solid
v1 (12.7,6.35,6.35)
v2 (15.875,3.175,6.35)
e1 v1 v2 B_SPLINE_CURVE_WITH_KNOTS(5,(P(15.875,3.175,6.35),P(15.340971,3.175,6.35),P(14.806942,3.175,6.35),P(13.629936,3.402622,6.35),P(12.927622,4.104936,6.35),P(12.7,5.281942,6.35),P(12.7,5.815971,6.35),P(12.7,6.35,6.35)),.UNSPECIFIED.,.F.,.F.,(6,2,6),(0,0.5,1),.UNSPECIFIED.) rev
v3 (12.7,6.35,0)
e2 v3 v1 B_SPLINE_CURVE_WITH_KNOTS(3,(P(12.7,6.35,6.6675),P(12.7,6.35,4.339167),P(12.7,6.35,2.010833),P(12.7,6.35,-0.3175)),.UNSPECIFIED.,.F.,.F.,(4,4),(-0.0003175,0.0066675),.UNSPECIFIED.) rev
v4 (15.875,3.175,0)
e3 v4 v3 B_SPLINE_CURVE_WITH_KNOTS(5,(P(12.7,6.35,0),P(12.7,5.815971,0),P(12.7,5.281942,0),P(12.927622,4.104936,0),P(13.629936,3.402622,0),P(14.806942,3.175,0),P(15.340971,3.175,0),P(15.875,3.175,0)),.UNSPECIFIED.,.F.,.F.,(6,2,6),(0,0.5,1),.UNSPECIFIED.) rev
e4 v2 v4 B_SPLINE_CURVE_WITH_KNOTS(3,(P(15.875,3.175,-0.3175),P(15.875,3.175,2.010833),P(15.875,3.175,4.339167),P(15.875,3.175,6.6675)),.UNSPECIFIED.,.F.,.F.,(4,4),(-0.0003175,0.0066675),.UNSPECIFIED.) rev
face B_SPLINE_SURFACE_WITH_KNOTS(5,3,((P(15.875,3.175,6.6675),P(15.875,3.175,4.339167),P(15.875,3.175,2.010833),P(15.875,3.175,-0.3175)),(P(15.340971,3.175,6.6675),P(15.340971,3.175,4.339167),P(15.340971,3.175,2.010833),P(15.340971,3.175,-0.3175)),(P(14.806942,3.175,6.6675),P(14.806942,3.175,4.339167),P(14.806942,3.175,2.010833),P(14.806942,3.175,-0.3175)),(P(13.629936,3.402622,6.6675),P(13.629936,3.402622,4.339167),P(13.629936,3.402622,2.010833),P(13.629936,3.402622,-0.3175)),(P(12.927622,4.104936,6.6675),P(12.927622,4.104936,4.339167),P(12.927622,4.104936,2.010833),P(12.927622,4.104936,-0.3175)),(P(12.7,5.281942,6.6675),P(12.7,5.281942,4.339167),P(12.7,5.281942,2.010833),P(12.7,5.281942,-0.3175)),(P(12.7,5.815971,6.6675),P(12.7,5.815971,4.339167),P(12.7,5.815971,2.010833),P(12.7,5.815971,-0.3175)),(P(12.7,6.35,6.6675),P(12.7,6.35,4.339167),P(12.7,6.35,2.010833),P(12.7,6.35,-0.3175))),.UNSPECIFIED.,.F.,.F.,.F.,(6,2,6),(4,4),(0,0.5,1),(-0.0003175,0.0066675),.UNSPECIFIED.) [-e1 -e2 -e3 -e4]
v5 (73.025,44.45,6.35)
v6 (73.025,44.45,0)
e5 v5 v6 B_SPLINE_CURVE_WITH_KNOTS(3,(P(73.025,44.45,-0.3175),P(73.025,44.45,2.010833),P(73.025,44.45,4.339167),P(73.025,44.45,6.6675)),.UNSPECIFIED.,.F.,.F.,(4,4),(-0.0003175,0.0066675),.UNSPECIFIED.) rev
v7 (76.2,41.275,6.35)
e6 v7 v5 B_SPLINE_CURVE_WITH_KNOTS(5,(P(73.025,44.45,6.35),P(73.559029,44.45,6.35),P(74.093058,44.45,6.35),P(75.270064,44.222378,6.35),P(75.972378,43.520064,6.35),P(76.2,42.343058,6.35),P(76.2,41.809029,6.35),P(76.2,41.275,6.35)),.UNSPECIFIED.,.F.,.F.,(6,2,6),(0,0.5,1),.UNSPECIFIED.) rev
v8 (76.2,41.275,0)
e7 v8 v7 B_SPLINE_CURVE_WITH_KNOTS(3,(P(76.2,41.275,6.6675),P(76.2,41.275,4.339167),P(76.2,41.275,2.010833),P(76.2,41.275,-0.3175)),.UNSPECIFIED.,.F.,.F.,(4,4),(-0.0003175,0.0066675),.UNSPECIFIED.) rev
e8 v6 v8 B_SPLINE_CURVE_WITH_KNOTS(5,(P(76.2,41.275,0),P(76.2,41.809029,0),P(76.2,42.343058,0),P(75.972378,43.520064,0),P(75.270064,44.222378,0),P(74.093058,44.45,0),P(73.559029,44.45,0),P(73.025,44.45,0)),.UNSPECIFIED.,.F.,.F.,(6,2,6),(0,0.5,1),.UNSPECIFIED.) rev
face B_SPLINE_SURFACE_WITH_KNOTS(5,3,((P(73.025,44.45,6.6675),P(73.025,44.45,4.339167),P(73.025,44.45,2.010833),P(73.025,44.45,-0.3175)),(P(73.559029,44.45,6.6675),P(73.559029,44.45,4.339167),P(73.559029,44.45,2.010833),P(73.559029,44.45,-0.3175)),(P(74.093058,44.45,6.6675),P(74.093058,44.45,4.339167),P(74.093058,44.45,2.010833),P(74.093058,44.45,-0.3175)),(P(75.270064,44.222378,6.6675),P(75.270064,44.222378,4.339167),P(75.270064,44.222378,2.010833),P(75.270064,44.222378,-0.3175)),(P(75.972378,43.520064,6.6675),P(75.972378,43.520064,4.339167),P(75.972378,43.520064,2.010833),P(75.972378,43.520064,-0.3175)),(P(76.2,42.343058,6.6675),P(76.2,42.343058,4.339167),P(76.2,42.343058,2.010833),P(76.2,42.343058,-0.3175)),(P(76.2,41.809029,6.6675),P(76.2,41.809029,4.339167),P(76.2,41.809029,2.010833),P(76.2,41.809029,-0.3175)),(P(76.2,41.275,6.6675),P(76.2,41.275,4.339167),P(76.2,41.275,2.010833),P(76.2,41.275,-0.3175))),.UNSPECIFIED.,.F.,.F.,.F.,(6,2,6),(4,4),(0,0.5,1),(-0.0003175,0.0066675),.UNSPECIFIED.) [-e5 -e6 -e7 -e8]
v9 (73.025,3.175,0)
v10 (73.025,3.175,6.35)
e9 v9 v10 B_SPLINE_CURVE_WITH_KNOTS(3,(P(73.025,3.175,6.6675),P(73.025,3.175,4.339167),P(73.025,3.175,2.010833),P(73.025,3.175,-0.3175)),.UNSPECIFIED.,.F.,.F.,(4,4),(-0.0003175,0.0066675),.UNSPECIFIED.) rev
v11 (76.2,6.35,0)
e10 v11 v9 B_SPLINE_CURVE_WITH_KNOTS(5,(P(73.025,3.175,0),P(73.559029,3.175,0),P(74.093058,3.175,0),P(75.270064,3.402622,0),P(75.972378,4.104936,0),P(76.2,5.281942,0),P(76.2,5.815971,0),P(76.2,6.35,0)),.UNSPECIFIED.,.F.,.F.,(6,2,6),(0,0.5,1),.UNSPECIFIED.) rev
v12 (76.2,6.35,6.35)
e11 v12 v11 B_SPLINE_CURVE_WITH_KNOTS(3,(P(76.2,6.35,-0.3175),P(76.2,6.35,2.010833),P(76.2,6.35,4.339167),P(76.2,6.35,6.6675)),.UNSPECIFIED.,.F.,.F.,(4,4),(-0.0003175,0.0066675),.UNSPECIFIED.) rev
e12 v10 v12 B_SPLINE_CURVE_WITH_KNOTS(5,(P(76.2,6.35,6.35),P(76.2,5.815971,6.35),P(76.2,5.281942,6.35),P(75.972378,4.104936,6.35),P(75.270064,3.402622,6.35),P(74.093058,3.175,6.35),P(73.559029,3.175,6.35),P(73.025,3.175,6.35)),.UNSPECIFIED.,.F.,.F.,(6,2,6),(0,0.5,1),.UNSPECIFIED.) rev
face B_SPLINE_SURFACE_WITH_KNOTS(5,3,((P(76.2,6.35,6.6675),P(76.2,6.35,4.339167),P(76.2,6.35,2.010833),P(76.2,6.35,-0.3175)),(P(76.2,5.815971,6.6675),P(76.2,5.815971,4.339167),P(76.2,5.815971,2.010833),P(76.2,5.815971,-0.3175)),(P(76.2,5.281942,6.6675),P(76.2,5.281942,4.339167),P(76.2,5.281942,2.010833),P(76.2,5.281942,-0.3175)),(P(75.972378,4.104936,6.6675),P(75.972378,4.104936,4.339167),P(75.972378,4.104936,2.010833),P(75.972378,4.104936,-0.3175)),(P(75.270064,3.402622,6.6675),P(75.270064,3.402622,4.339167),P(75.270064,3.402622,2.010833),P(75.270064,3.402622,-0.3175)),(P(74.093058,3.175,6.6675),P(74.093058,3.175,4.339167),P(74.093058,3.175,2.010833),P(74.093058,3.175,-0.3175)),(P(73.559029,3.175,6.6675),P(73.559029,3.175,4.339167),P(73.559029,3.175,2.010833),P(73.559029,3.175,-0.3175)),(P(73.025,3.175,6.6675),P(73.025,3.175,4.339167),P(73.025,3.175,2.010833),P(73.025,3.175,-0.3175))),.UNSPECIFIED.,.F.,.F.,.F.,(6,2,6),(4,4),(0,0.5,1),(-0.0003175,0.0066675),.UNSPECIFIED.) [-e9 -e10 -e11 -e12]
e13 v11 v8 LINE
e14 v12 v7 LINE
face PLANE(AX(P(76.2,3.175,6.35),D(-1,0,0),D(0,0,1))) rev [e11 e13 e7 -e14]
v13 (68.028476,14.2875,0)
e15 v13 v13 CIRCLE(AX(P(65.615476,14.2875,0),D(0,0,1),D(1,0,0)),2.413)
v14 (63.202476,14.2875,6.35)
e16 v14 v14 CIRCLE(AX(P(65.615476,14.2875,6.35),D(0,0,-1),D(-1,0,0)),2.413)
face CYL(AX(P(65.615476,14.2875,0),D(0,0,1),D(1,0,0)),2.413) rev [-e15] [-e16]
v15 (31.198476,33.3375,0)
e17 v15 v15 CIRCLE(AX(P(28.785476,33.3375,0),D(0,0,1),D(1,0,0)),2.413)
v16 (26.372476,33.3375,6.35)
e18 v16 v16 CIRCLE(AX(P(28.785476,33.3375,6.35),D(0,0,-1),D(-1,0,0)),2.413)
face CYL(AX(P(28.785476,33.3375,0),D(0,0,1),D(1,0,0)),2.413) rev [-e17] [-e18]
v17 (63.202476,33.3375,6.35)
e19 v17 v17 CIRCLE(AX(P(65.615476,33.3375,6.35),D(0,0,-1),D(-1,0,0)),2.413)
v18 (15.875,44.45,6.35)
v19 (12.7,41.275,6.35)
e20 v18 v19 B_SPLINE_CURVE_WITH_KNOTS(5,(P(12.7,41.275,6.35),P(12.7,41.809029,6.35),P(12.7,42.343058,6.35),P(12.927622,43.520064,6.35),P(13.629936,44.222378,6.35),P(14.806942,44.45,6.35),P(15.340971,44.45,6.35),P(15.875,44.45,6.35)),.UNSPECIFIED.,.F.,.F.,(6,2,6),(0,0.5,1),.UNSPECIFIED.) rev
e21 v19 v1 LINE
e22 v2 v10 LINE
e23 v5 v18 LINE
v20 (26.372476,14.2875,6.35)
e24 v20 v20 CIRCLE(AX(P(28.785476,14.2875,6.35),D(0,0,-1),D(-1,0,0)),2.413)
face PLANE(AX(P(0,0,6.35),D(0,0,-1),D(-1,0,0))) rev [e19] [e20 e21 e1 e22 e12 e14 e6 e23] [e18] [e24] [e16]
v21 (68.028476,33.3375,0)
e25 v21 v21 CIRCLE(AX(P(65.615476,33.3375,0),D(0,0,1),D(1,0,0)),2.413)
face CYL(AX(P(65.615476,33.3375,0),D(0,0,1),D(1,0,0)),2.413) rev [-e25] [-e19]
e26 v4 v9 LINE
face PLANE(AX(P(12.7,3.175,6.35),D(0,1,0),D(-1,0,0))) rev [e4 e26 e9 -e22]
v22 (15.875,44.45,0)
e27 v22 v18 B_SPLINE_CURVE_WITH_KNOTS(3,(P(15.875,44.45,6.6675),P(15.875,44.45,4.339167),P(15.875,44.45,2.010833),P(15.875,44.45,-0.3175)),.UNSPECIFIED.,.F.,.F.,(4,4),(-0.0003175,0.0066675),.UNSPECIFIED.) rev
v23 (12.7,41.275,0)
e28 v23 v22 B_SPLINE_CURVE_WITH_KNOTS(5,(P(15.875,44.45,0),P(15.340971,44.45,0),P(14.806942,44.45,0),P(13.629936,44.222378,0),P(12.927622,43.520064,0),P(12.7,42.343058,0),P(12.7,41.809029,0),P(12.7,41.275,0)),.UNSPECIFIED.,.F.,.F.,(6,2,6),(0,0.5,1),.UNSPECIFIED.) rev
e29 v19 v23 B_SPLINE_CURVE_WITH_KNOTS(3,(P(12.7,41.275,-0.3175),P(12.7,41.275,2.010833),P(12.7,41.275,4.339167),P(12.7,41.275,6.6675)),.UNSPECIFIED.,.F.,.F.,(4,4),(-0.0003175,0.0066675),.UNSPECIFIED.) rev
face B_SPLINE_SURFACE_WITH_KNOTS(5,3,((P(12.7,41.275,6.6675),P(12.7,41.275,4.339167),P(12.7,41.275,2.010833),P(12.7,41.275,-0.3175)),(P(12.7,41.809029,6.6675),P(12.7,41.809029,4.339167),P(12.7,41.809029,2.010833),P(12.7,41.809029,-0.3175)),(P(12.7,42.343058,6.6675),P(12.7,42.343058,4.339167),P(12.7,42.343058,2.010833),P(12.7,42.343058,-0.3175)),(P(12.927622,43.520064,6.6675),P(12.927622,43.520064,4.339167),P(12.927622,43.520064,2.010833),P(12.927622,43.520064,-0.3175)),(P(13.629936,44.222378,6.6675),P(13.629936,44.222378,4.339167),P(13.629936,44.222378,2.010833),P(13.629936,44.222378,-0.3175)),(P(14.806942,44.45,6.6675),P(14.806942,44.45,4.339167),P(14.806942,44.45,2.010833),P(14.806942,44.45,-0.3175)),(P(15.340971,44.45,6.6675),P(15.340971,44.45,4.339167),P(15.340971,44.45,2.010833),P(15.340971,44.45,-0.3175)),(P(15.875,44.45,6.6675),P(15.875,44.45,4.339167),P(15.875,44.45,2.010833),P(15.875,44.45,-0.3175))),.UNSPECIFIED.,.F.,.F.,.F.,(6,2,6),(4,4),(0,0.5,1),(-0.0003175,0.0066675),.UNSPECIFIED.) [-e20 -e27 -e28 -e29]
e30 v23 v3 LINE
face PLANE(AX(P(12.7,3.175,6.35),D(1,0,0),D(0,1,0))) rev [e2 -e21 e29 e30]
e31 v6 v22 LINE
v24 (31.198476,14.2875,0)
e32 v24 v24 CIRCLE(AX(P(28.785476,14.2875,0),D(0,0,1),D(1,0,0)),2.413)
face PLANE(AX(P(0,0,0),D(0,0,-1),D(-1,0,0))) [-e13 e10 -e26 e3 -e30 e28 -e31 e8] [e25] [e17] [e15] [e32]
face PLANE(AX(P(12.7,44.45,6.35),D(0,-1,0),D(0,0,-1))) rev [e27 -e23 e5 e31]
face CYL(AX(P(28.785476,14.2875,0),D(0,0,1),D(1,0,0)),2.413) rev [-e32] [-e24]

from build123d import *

# Parameters (mm, degrees)
SKETCH1_W               = 63.5
SKETCH1_H               = 41.275
BOSS_EXTRUDE1_DEPTH     = 6.35
CUT_EXTRUDE1_DEPTH      = 89.44526556
CUT_EXTRUDE1_DEPTH_BACK = 89.44526556
SKETCH3_R               = 2.413
FILLET1_SIZE            = 3.175


with BuildPart() as part:
    # Sketch1 → Boss-Extrude1 (new body)
    with BuildSketch(Plane.XY):
        with Locations((44.45, 23.8125)):
            Rectangle(SKETCH1_W, SKETCH1_H)
    extrude(amount=BOSS_EXTRUDE1_DEPTH)

    # Sketch3 → Cut-Extrude1 (cut, two sides: drawn at the far end of the back side and taken through both)
    with BuildSketch(Plane.XY.offset(6.35).offset(-CUT_EXTRUDE1_DEPTH_BACK)):
        with Locations((65.615475516, 33.3375)):
            Circle(SKETCH3_R)
        with Locations((28.785475516, 33.3375)):
            Circle(SKETCH3_R)
        with Locations((28.785475516, 14.2875)):
            Circle(SKETCH3_R)
        with Locations((65.615475516, 14.2875)):
            Circle(SKETCH3_R)
    extrude(amount=CUT_EXTRUDE1_DEPTH + CUT_EXTRUDE1_DEPTH_BACK, mode=Mode.SUBTRACT)

    # Fillet1
    # a fillet whose section is not a circle: 3.175 mm, written as the material it takes off along each edge
    with BuildSketch(Plane(origin=(12.7, 3.175, -7.9375), x_dir=(1, 0, 0), z_dir=(0, 0, 1)), Plane(origin=(12.7, 44.45, -7.9375), x_dir=(0, -1, 0), z_dir=(0, 0, 1))) as fillet1_piece_1:
        with BuildLine():
            add(Edge.make_bspline([(FILLET1_SIZE, 0), (FILLET1_SIZE * 0.831801948466, 0), (FILLET1_SIZE * 0.663603896932, 0), (FILLET1_SIZE * 0.292893218813, FILLET1_SIZE * 0.0716919198361), (FILLET1_SIZE * 0.0716919198361, FILLET1_SIZE * 0.292893218813), (0, FILLET1_SIZE * 0.663603896932), (0, FILLET1_SIZE * 0.831801948466), (0, FILLET1_SIZE)], knots=[0, 0, 0, 0, 0, 0, 0.5, 0.5, 1, 1, 1, 1, 1, 1], degree=5))
            Line((0, FILLET1_SIZE), (0, 0))
            Line((0, 0), (FILLET1_SIZE, 0))
        make_face()
    extrude(amount=22.225, mode=Mode.SUBTRACT)
    with BuildSketch(Plane(origin=(76.2, 3.175, -7.9375), x_dir=(-1, 0, 0), z_dir=(0, 0, 1)), Plane(origin=(76.2, 44.45, -7.9375), x_dir=(0, -1, 0), z_dir=(0, 0, 1))) as fillet1_piece_2:
        with BuildLine():
            add(Edge.make_bspline([(FILLET1_SIZE, 0), (FILLET1_SIZE * 0.831801948466, 0), (FILLET1_SIZE * 0.663603896932, 0), (FILLET1_SIZE * 0.292893218813, -FILLET1_SIZE * 0.0716919198361), (FILLET1_SIZE * 0.0716919198361, -FILLET1_SIZE * 0.292893218813), (0, -FILLET1_SIZE * 0.663603896932), (0, -FILLET1_SIZE * 0.831801948466), (0, -FILLET1_SIZE)], knots=[0, 0, 0, 0, 0, 0, 0.5, 0.5, 1, 1, 1, 1, 1, 1], degree=5))
            Line((0, -FILLET1_SIZE), (0, 0))
            Line((0, 0), (FILLET1_SIZE, 0))
        make_face()
    extrude(amount=22.225, mode=Mode.SUBTRACT)


solid = part.part
